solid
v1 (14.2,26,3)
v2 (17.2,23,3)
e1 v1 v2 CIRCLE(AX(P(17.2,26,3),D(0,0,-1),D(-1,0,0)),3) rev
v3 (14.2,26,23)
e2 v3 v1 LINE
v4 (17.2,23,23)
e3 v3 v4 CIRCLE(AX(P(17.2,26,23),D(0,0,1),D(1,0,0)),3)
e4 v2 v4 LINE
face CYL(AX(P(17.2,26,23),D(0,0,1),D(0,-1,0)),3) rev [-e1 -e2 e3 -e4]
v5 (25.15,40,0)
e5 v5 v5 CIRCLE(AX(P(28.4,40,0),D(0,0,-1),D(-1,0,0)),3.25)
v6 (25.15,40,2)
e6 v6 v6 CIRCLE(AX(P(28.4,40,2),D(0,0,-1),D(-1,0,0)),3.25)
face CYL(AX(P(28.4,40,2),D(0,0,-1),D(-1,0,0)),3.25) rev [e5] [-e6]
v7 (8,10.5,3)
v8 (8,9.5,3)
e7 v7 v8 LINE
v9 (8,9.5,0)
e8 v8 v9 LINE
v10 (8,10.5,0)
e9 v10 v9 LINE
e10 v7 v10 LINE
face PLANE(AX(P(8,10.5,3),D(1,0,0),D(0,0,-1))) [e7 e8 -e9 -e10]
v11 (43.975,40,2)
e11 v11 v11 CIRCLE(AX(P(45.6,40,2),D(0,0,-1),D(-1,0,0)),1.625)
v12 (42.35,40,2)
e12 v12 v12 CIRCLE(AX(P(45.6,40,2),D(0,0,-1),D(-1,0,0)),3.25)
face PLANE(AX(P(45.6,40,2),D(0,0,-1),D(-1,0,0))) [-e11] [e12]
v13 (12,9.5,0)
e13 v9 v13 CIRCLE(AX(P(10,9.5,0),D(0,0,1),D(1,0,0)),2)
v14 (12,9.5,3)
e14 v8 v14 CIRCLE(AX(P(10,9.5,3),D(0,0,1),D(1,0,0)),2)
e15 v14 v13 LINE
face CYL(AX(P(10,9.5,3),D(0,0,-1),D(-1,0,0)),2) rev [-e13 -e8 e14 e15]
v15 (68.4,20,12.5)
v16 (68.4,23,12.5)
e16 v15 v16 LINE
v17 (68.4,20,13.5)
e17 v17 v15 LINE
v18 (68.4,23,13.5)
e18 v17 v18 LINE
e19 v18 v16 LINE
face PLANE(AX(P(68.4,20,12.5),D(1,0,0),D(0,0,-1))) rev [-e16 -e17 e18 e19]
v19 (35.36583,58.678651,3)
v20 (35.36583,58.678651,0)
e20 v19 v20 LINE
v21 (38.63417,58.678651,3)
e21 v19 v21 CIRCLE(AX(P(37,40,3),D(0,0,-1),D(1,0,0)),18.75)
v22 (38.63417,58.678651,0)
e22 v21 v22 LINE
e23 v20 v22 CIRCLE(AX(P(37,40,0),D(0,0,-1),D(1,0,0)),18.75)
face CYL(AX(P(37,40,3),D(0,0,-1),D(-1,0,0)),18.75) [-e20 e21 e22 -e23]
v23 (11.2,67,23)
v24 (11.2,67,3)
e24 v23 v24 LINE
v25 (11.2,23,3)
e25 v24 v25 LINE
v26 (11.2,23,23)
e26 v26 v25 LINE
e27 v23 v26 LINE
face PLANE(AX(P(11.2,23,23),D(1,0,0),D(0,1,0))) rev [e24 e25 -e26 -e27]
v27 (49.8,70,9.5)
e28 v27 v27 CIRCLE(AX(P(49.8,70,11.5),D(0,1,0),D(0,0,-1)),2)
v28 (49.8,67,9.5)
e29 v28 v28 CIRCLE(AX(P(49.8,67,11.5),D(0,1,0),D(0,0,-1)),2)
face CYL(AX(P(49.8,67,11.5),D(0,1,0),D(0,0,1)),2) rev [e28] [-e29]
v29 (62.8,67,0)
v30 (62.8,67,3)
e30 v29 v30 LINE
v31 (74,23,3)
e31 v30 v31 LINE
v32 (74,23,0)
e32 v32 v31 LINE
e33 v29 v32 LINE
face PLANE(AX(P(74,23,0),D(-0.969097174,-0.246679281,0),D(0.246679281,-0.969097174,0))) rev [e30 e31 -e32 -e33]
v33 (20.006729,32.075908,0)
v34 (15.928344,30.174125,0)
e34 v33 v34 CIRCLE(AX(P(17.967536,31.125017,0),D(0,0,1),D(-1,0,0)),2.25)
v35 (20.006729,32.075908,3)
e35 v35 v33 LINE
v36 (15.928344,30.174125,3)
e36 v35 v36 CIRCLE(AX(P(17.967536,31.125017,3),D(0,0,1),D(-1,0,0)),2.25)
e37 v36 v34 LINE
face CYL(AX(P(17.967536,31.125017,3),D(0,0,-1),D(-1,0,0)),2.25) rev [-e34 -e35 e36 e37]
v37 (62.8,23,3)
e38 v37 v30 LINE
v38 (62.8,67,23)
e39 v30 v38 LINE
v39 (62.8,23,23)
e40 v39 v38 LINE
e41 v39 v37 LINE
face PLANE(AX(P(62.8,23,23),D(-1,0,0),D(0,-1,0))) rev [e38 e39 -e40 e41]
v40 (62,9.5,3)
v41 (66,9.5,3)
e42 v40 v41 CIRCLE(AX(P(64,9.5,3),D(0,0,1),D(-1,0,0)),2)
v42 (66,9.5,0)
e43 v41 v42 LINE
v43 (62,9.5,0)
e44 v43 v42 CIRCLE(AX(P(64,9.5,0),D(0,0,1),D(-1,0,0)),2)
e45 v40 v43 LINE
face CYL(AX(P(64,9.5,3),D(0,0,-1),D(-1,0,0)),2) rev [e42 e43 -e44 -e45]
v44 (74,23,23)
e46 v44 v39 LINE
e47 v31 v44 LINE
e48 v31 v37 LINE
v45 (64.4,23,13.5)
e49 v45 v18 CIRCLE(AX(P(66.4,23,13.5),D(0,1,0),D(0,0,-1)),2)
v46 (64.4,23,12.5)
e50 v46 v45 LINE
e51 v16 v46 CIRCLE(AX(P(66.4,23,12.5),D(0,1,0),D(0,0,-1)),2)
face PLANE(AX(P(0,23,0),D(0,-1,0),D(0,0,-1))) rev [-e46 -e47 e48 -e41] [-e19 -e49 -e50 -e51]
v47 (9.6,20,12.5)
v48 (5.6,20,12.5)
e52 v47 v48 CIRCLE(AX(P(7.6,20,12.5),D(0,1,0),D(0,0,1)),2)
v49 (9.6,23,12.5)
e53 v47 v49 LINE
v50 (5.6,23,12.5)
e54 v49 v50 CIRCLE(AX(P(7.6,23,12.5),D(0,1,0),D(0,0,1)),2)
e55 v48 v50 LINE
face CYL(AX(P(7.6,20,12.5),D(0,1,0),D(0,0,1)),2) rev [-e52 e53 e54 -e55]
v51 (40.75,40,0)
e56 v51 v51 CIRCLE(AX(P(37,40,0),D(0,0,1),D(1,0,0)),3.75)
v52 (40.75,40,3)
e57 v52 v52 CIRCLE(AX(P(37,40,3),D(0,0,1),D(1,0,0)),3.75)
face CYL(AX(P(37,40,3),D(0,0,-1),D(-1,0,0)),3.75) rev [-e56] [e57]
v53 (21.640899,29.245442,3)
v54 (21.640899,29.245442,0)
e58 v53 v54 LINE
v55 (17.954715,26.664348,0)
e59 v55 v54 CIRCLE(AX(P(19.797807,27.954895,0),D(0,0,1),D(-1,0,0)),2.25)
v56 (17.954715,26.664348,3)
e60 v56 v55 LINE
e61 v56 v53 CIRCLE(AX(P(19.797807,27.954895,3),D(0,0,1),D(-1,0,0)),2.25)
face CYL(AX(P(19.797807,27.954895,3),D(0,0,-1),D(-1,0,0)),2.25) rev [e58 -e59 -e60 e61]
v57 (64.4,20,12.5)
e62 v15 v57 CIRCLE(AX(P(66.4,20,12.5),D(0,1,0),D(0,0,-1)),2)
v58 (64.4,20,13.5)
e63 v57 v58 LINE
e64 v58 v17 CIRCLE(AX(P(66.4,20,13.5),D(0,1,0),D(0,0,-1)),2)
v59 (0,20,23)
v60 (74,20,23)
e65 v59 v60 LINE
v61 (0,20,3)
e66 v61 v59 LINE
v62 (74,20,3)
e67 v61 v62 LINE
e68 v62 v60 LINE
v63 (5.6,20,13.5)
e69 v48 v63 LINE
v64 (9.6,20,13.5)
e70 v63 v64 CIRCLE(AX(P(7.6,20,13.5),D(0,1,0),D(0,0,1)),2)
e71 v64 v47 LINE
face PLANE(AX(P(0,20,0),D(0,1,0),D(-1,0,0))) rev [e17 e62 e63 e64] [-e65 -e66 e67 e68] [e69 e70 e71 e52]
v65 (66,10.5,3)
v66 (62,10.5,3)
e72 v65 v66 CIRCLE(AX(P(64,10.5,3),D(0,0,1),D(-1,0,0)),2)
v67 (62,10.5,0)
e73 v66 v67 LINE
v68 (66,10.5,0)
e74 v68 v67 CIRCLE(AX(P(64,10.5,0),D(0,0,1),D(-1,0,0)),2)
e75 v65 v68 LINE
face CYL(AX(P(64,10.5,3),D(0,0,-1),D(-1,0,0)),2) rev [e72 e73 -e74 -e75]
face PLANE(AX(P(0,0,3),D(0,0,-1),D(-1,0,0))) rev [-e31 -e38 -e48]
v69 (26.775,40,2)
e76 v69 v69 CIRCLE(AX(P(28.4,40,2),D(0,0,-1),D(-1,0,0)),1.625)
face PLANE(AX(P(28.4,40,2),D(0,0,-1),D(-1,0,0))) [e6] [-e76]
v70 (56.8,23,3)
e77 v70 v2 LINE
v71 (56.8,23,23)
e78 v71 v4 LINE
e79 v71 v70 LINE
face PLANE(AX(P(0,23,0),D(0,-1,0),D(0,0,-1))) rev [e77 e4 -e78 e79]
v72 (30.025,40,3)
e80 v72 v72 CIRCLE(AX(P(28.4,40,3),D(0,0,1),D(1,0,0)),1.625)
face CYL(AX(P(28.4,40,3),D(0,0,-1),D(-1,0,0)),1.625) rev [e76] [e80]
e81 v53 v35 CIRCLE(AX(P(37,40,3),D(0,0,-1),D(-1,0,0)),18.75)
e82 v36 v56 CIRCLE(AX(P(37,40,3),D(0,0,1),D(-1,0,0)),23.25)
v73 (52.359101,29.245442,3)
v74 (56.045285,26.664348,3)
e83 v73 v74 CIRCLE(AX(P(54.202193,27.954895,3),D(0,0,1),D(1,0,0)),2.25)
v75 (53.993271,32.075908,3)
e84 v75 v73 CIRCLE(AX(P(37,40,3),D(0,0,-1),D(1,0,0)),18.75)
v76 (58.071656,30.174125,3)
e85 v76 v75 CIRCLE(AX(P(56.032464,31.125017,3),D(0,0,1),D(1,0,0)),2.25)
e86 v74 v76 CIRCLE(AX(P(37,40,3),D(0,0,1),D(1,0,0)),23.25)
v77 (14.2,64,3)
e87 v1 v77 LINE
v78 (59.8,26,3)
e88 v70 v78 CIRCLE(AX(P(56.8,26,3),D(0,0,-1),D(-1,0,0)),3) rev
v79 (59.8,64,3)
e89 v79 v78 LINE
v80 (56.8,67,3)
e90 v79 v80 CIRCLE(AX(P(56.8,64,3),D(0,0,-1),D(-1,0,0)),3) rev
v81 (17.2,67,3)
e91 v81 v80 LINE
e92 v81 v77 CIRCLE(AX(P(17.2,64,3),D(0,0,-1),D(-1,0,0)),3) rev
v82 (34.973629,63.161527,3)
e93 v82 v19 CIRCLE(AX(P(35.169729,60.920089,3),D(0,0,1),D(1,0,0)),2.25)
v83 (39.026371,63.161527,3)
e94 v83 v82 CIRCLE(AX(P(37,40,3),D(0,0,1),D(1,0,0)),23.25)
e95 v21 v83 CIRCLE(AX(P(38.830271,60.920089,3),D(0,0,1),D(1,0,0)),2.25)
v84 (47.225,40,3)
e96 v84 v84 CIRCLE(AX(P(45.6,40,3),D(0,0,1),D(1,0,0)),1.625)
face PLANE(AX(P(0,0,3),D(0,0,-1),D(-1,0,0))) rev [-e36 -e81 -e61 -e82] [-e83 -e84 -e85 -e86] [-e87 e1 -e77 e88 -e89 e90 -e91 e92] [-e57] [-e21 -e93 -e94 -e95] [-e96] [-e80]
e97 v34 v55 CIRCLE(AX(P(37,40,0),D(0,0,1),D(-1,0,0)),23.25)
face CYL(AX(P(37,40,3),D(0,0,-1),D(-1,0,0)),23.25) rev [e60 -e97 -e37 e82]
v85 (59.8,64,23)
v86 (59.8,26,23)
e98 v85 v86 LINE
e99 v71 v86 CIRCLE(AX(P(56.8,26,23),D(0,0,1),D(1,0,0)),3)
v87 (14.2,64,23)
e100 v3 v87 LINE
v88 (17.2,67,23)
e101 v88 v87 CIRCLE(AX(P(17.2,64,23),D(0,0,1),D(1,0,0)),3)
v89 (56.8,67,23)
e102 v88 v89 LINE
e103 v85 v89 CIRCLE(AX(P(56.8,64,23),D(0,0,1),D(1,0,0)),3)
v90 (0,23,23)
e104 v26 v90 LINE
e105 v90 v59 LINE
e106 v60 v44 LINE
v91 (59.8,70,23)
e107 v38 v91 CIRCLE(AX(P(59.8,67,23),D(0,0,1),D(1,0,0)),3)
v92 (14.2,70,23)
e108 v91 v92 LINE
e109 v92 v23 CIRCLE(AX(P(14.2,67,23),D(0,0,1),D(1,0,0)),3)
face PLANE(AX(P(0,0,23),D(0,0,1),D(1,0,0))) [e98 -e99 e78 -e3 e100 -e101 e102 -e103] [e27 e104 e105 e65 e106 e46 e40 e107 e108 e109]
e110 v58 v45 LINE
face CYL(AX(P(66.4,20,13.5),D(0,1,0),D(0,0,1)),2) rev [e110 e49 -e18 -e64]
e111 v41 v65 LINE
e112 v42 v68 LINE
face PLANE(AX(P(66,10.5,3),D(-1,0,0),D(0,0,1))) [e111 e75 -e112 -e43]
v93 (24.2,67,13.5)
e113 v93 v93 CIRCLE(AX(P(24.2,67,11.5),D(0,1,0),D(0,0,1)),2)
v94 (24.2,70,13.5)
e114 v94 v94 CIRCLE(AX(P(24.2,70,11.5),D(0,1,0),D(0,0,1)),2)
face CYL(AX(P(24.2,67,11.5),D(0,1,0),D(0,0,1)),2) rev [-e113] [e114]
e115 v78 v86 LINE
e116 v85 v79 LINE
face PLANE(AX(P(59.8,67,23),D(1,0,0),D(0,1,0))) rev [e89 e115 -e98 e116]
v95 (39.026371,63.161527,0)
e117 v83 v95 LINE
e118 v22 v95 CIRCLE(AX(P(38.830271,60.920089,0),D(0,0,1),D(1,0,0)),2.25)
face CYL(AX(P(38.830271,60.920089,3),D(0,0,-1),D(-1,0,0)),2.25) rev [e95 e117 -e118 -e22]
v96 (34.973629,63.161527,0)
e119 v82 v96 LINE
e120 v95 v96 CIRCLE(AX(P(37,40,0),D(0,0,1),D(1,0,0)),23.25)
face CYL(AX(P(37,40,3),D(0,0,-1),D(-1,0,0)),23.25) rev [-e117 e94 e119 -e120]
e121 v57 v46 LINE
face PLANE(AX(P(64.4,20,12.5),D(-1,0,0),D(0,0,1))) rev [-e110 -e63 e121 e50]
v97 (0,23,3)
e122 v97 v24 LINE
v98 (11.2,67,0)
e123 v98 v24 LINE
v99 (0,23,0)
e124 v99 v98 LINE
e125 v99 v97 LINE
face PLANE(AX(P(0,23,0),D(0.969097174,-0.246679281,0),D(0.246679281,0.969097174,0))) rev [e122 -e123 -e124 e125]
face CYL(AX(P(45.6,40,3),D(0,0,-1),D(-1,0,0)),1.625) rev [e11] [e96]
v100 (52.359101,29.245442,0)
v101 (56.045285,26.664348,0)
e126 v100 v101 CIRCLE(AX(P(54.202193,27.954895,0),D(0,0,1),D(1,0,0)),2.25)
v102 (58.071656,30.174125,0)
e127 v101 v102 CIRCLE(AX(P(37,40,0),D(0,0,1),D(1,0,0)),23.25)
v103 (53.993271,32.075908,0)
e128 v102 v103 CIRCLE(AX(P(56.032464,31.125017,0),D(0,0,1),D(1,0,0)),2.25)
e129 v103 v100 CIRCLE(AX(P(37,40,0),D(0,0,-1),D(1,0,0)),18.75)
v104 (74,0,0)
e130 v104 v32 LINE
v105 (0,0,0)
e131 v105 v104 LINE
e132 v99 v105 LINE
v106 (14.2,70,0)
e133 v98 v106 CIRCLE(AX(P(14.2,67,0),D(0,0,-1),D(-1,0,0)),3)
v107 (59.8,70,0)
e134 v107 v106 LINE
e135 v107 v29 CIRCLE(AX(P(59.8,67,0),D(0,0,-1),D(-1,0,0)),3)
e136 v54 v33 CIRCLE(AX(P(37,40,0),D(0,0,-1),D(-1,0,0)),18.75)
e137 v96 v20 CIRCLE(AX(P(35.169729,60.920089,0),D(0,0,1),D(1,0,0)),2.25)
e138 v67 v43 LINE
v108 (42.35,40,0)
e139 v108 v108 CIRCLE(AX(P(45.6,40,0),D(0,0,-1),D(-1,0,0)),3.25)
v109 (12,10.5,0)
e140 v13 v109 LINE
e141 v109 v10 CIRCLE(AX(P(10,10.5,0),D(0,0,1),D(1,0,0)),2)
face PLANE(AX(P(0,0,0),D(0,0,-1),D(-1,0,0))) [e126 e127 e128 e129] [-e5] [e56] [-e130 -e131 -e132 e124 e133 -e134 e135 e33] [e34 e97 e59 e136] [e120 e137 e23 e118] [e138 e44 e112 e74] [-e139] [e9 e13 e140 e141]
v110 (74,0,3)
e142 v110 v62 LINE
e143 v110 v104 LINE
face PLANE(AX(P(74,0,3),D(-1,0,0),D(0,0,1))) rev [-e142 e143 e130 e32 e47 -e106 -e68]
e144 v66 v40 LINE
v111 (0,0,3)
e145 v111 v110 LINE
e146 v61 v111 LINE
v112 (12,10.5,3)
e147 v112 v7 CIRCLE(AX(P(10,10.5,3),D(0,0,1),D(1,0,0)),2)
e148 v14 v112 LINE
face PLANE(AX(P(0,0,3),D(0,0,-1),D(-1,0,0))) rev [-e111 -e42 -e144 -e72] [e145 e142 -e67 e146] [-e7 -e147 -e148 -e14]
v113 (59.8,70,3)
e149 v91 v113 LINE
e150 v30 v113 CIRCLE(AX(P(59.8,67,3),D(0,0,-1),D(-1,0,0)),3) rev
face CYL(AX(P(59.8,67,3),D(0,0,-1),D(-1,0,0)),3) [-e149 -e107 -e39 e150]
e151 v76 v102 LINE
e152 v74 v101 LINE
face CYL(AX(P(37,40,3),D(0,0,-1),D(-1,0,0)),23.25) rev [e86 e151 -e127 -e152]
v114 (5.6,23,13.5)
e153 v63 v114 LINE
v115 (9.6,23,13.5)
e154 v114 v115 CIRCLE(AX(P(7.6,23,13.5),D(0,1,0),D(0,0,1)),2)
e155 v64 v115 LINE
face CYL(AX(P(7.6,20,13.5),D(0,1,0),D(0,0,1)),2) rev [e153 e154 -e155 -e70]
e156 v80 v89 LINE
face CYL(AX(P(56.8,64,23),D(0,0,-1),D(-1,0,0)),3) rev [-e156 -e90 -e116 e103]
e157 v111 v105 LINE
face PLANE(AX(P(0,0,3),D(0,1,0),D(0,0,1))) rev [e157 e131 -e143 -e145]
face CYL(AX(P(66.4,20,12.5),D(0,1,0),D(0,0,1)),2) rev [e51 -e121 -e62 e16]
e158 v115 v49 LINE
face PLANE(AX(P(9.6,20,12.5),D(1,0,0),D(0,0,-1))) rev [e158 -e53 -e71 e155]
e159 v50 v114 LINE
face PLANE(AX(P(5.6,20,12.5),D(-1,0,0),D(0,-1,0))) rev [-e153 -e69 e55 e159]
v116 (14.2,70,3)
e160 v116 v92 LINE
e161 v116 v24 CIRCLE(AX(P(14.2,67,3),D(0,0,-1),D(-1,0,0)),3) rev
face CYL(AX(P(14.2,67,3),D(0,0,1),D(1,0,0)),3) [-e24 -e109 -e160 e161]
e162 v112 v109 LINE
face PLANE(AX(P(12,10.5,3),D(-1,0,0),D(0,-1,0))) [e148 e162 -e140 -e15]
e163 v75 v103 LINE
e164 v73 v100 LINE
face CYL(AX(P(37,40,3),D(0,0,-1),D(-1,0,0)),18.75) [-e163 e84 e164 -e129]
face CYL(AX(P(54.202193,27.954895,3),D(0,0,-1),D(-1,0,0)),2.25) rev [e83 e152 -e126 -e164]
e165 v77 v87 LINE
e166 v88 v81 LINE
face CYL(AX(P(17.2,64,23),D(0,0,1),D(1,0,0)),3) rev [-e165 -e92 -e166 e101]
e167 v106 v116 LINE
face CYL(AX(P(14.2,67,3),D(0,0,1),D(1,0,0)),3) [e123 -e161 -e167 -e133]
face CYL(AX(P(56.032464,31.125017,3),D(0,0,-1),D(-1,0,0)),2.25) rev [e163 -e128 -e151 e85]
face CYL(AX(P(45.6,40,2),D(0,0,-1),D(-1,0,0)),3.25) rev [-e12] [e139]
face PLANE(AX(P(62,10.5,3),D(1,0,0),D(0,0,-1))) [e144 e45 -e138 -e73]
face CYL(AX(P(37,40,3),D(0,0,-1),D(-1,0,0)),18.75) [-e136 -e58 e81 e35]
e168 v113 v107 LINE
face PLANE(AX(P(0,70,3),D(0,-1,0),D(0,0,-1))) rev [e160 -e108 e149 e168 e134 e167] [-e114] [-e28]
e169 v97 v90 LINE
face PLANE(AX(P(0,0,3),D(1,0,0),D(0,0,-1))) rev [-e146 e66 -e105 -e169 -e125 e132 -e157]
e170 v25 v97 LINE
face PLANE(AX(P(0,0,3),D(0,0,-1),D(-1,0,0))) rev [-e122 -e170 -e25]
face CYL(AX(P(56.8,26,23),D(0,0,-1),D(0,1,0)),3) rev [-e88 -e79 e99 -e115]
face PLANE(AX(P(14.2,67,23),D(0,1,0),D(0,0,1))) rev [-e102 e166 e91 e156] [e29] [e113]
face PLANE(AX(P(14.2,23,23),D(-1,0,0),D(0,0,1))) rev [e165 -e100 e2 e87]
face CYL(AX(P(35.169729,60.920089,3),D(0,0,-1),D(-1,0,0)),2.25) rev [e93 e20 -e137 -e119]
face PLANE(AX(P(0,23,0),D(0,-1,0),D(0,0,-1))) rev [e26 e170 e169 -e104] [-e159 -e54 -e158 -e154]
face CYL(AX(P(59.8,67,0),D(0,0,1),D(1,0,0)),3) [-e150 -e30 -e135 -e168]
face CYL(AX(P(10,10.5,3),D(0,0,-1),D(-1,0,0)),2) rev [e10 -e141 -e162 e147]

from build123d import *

# Parameters (mm, degrees)
SKETCH1_W           = 74
SKETCH1_H           = 70
SKETCH1_R           = 3.75
SKETCH1_R_2         = 1.625
BOSS_EXTRUDE1_DEPTH = 3
BOSS_EXTRUDE2_DEPTH = 20
CUT_EXTRUDE2_DEPTH  = 3
FILLET1_R           = 3
FILLET2_R           = 3
FILLET4_R           = 3
FILLET5_R           = 3
CUT_EXTRUDE4_DEPTH  = 3
FILLET6_R           = 3
FILLET7_R           = 3
FILLET8_R           = 3
FILLET9_R           = 3
SKETCH11_R          = 2
CUT_EXTRUDE5_DEPTH  = 3
SKETCH12_R          = 3.25
CUT_EXTRUDE6_DEPTH  = 2


with BuildPart() as part:
    # Sketch1 → Boss-Extrude1 (new body)
    with BuildSketch(Plane.XY):
        with Locations((37, 35)):
            Rectangle(SKETCH1_W, SKETCH1_H)
        with Locations((37, 40)):
            Circle(SKETCH1_R, mode=Mode.SUBTRACT)
        with Locations((28.4, 40)):
            Circle(SKETCH1_R_2, mode=Mode.SUBTRACT)
        with Locations((45.6, 40)):
            Circle(SKETCH1_R_2, mode=Mode.SUBTRACT)
        with BuildLine():
            Line((8, 10.5), (8, 9.5))
            ThreePointArc((8, 9.5), (10, 7.5), (12, 9.5))
            Line((12, 9.5), (12, 10.5))
            ThreePointArc((12, 10.5), (10, 12.5), (8, 10.5))
        make_face(mode=Mode.SUBTRACT)
        with BuildLine():
            Line((66, 10.5), (66, 9.5))
            ThreePointArc((66, 9.5), (64, 7.5), (62, 9.5))
            Line((62, 9.5), (62, 10.5))
            ThreePointArc((62, 10.5), (64, 12.5), (66, 10.5))
        make_face(mode=Mode.SUBTRACT)
        with BuildLine():
            ThreePointArc((34.973628981, 63.161526731), (32.928291332, 60.723988239), (35.365829823, 58.678650589))
            ThreePointArc((35.365829823, 58.678650589), (37, 58.75), (38.634170177, 58.678650589))
            ThreePointArc((38.634170177, 58.678650589), (41.071708668, 60.723988239), (39.026371019, 63.161526731))
            ThreePointArc((39.026371019, 63.161526731), (37, 63.25), (34.973628981, 63.161526731))
        make_face(mode=Mode.SUBTRACT)
        with BuildLine():
            ThreePointArc((15.928343951, 30.174125415), (17.016645383, 33.164209024), (20.006728993, 32.075907592))
            ThreePointArc((20.006728993, 32.075907592), (20.762023679, 30.625), (21.64089917, 29.245441818))
            ThreePointArc((21.64089917, 29.245441818), (21.088354052, 26.111802737), (17.95471497, 26.664347855))
            ThreePointArc((17.95471497, 26.664347855), (16.864909362, 28.375), (15.928343951, 30.174125415))
        make_face(mode=Mode.SUBTRACT)
        with BuildLine():
            ThreePointArc((58.071656049, 30.174125415), (56.983354617, 33.164209024), (53.993271007, 32.075907592))
            ThreePointArc((53.993271007, 32.075907592), (53.237976321, 30.625), (52.35910083, 29.245441818))
            ThreePointArc((52.35910083, 29.245441818), (52.911645948, 26.111802737), (56.04528503, 26.664347855))
            ThreePointArc((56.04528503, 26.664347855), (57.135090638, 28.375), (58.071656049, 30.174125415))
        make_face(mode=Mode.SUBTRACT)
    extrude(amount=BOSS_EXTRUDE1_DEPTH)

    # Sketch2 → Loft1 section 0
    with BuildSketch(Plane.XY.offset(3)):
        with BuildLine():
            Line((0, 23), (74, 23))
            Line((74, 23), (74, 20))
            Line((74, 20), (0, 20))
            Line((0, 20), (0, 23))
        make_face()
    # Sketch3 → Loft1 section 1
    with BuildSketch(Plane.XY.offset(23)):
        with BuildLine():
            Line((0, 23), (74, 23))
            Line((74, 23), (74, 20))
            Line((74, 20), (0, 20))
            Line((0, 20), (0, 23))
        make_face()
    loft()

    # Sketch4 → Boss-Extrude2 (add)
    with BuildSketch(Plane.XY.offset(3)):
        Polygon((14.2, 23), (14.2, 67), (59.8, 67), (59.8, 23), (62.8, 23), (62.8, 70), (11.2, 70), (11.2, 23), align=None)
    extrude(amount=BOSS_EXTRUDE2_DEPTH)

    # Sketch8 → Cut-Extrude2 (cut)
    with BuildSketch(Plane(origin=(0, 23, 0), x_dir=(1, 0, 0), z_dir=(0, 1, 0))):
        with BuildLine():
            Line((5.6, -12.5), (5.6, -13.5))
            ThreePointArc((5.6, -13.5), (7.6, -15.5), (9.6, -13.5))
            Line((9.6, -13.5), (9.6, -12.5))
            ThreePointArc((9.6, -12.5), (7.6, -10.5), (5.6, -12.5))
        make_face()
        with BuildLine():
            Line((68.4, -12.5), (68.4, -13.5))
            ThreePointArc((68.4, -13.5), (66.4, -15.5), (64.4, -13.5))
            Line((64.4, -13.5), (64.4, -12.5))
            ThreePointArc((64.4, -12.5), (66.4, -10.5), (68.4, -12.5))
        make_face()
    extrude(amount=-CUT_EXTRUDE2_DEPTH, mode=Mode.SUBTRACT)

    # Fillet1
    fillet1_edges = [part.edges().sort_by_distance(p)[0] for p in [
        (11.2, 70, 13),
    ]]
    fillet(fillet1_edges, radius=FILLET1_R)

    # Fillet2
    fillet2_edges = [part.edges().sort_by_distance(p)[0] for p in [
        (62.8, 70, 13),
    ]]
    fillet(fillet2_edges, radius=FILLET2_R)

    # Fillet4
    fillet4_edges = [part.edges().sort_by_distance(p)[0] for p in [
        (59.8, 67, 13),
    ]]
    fillet(fillet4_edges, radius=FILLET4_R)

    # Fillet5
    fillet5_edges = [part.edges().sort_by_distance(p)[0] for p in [
        (14.2, 67, 13),
    ]]
    fillet(fillet5_edges, radius=FILLET5_R)

    # Sketch10 → Cut-Extrude4 (cut)
    with BuildSketch(Plane.XY.offset(3)):
        Polygon((0, 23), (11.2, 67), (11.2, 70), (0, 70), align=None)
        Polygon((74, 23), (62.8, 67), (62.8, 70), (74, 70), align=None)
    extrude(amount=-CUT_EXTRUDE4_DEPTH, mode=Mode.SUBTRACT)

    # Fillet6
    fillet6_edges = [part.edges().sort_by_distance(p)[0] for p in [
        (62.8, 70, 1.5),
    ]]
    fillet(fillet6_edges, radius=FILLET6_R - 0.0001)  # a hair under: the kernel refuses the full size

    # Fillet7
    fillet7_edges = [part.edges().sort_by_distance(p)[0] for p in [
        (11.2, 70, 1.5),
    ]]
    fillet(fillet7_edges, radius=FILLET7_R - 0.0001)  # a hair under: the kernel refuses the full size

    # Fillet8
    fillet8_edges = [part.edges().sort_by_distance(p)[0] for p in [
        (14.2, 23, 13),
    ]]
    fillet(fillet8_edges, radius=FILLET8_R)

    # Fillet9
    fillet9_edges = [part.edges().sort_by_distance(p)[0] for p in [
        (59.8, 23, 13),
    ]]
    fillet(fillet9_edges, radius=FILLET9_R)

    # Sketch11 → Cut-Extrude5 (cut)
    with BuildSketch(Plane(origin=(0, 70, 0), x_dir=(1, 0, 0), z_dir=(0, 1, 0))):
        with Locations(Location((24.2, -11.5, 0), (0, 0, 270))):
            Circle(SKETCH11_R)
        with Locations(Location((49.8, -11.5, 0), (0, 0, 90))):
            Circle(SKETCH11_R)
    extrude(amount=-CUT_EXTRUDE5_DEPTH, mode=Mode.SUBTRACT)

    # Sketch12 → Cut-Extrude6 (cut)
    with BuildSketch(Plane(origin=(0, 0, 0), x_dir=(-1, 0, 0), z_dir=(0, 0, -1))):
        with Locations((-45.6, 40)):
            Circle(SKETCH12_R)
        with Locations((-28.4, 40)):
            Circle(SKETCH12_R)
    extrude(amount=-CUT_EXTRUDE6_DEPTH, mode=Mode.SUBTRACT)


solid = part.part
